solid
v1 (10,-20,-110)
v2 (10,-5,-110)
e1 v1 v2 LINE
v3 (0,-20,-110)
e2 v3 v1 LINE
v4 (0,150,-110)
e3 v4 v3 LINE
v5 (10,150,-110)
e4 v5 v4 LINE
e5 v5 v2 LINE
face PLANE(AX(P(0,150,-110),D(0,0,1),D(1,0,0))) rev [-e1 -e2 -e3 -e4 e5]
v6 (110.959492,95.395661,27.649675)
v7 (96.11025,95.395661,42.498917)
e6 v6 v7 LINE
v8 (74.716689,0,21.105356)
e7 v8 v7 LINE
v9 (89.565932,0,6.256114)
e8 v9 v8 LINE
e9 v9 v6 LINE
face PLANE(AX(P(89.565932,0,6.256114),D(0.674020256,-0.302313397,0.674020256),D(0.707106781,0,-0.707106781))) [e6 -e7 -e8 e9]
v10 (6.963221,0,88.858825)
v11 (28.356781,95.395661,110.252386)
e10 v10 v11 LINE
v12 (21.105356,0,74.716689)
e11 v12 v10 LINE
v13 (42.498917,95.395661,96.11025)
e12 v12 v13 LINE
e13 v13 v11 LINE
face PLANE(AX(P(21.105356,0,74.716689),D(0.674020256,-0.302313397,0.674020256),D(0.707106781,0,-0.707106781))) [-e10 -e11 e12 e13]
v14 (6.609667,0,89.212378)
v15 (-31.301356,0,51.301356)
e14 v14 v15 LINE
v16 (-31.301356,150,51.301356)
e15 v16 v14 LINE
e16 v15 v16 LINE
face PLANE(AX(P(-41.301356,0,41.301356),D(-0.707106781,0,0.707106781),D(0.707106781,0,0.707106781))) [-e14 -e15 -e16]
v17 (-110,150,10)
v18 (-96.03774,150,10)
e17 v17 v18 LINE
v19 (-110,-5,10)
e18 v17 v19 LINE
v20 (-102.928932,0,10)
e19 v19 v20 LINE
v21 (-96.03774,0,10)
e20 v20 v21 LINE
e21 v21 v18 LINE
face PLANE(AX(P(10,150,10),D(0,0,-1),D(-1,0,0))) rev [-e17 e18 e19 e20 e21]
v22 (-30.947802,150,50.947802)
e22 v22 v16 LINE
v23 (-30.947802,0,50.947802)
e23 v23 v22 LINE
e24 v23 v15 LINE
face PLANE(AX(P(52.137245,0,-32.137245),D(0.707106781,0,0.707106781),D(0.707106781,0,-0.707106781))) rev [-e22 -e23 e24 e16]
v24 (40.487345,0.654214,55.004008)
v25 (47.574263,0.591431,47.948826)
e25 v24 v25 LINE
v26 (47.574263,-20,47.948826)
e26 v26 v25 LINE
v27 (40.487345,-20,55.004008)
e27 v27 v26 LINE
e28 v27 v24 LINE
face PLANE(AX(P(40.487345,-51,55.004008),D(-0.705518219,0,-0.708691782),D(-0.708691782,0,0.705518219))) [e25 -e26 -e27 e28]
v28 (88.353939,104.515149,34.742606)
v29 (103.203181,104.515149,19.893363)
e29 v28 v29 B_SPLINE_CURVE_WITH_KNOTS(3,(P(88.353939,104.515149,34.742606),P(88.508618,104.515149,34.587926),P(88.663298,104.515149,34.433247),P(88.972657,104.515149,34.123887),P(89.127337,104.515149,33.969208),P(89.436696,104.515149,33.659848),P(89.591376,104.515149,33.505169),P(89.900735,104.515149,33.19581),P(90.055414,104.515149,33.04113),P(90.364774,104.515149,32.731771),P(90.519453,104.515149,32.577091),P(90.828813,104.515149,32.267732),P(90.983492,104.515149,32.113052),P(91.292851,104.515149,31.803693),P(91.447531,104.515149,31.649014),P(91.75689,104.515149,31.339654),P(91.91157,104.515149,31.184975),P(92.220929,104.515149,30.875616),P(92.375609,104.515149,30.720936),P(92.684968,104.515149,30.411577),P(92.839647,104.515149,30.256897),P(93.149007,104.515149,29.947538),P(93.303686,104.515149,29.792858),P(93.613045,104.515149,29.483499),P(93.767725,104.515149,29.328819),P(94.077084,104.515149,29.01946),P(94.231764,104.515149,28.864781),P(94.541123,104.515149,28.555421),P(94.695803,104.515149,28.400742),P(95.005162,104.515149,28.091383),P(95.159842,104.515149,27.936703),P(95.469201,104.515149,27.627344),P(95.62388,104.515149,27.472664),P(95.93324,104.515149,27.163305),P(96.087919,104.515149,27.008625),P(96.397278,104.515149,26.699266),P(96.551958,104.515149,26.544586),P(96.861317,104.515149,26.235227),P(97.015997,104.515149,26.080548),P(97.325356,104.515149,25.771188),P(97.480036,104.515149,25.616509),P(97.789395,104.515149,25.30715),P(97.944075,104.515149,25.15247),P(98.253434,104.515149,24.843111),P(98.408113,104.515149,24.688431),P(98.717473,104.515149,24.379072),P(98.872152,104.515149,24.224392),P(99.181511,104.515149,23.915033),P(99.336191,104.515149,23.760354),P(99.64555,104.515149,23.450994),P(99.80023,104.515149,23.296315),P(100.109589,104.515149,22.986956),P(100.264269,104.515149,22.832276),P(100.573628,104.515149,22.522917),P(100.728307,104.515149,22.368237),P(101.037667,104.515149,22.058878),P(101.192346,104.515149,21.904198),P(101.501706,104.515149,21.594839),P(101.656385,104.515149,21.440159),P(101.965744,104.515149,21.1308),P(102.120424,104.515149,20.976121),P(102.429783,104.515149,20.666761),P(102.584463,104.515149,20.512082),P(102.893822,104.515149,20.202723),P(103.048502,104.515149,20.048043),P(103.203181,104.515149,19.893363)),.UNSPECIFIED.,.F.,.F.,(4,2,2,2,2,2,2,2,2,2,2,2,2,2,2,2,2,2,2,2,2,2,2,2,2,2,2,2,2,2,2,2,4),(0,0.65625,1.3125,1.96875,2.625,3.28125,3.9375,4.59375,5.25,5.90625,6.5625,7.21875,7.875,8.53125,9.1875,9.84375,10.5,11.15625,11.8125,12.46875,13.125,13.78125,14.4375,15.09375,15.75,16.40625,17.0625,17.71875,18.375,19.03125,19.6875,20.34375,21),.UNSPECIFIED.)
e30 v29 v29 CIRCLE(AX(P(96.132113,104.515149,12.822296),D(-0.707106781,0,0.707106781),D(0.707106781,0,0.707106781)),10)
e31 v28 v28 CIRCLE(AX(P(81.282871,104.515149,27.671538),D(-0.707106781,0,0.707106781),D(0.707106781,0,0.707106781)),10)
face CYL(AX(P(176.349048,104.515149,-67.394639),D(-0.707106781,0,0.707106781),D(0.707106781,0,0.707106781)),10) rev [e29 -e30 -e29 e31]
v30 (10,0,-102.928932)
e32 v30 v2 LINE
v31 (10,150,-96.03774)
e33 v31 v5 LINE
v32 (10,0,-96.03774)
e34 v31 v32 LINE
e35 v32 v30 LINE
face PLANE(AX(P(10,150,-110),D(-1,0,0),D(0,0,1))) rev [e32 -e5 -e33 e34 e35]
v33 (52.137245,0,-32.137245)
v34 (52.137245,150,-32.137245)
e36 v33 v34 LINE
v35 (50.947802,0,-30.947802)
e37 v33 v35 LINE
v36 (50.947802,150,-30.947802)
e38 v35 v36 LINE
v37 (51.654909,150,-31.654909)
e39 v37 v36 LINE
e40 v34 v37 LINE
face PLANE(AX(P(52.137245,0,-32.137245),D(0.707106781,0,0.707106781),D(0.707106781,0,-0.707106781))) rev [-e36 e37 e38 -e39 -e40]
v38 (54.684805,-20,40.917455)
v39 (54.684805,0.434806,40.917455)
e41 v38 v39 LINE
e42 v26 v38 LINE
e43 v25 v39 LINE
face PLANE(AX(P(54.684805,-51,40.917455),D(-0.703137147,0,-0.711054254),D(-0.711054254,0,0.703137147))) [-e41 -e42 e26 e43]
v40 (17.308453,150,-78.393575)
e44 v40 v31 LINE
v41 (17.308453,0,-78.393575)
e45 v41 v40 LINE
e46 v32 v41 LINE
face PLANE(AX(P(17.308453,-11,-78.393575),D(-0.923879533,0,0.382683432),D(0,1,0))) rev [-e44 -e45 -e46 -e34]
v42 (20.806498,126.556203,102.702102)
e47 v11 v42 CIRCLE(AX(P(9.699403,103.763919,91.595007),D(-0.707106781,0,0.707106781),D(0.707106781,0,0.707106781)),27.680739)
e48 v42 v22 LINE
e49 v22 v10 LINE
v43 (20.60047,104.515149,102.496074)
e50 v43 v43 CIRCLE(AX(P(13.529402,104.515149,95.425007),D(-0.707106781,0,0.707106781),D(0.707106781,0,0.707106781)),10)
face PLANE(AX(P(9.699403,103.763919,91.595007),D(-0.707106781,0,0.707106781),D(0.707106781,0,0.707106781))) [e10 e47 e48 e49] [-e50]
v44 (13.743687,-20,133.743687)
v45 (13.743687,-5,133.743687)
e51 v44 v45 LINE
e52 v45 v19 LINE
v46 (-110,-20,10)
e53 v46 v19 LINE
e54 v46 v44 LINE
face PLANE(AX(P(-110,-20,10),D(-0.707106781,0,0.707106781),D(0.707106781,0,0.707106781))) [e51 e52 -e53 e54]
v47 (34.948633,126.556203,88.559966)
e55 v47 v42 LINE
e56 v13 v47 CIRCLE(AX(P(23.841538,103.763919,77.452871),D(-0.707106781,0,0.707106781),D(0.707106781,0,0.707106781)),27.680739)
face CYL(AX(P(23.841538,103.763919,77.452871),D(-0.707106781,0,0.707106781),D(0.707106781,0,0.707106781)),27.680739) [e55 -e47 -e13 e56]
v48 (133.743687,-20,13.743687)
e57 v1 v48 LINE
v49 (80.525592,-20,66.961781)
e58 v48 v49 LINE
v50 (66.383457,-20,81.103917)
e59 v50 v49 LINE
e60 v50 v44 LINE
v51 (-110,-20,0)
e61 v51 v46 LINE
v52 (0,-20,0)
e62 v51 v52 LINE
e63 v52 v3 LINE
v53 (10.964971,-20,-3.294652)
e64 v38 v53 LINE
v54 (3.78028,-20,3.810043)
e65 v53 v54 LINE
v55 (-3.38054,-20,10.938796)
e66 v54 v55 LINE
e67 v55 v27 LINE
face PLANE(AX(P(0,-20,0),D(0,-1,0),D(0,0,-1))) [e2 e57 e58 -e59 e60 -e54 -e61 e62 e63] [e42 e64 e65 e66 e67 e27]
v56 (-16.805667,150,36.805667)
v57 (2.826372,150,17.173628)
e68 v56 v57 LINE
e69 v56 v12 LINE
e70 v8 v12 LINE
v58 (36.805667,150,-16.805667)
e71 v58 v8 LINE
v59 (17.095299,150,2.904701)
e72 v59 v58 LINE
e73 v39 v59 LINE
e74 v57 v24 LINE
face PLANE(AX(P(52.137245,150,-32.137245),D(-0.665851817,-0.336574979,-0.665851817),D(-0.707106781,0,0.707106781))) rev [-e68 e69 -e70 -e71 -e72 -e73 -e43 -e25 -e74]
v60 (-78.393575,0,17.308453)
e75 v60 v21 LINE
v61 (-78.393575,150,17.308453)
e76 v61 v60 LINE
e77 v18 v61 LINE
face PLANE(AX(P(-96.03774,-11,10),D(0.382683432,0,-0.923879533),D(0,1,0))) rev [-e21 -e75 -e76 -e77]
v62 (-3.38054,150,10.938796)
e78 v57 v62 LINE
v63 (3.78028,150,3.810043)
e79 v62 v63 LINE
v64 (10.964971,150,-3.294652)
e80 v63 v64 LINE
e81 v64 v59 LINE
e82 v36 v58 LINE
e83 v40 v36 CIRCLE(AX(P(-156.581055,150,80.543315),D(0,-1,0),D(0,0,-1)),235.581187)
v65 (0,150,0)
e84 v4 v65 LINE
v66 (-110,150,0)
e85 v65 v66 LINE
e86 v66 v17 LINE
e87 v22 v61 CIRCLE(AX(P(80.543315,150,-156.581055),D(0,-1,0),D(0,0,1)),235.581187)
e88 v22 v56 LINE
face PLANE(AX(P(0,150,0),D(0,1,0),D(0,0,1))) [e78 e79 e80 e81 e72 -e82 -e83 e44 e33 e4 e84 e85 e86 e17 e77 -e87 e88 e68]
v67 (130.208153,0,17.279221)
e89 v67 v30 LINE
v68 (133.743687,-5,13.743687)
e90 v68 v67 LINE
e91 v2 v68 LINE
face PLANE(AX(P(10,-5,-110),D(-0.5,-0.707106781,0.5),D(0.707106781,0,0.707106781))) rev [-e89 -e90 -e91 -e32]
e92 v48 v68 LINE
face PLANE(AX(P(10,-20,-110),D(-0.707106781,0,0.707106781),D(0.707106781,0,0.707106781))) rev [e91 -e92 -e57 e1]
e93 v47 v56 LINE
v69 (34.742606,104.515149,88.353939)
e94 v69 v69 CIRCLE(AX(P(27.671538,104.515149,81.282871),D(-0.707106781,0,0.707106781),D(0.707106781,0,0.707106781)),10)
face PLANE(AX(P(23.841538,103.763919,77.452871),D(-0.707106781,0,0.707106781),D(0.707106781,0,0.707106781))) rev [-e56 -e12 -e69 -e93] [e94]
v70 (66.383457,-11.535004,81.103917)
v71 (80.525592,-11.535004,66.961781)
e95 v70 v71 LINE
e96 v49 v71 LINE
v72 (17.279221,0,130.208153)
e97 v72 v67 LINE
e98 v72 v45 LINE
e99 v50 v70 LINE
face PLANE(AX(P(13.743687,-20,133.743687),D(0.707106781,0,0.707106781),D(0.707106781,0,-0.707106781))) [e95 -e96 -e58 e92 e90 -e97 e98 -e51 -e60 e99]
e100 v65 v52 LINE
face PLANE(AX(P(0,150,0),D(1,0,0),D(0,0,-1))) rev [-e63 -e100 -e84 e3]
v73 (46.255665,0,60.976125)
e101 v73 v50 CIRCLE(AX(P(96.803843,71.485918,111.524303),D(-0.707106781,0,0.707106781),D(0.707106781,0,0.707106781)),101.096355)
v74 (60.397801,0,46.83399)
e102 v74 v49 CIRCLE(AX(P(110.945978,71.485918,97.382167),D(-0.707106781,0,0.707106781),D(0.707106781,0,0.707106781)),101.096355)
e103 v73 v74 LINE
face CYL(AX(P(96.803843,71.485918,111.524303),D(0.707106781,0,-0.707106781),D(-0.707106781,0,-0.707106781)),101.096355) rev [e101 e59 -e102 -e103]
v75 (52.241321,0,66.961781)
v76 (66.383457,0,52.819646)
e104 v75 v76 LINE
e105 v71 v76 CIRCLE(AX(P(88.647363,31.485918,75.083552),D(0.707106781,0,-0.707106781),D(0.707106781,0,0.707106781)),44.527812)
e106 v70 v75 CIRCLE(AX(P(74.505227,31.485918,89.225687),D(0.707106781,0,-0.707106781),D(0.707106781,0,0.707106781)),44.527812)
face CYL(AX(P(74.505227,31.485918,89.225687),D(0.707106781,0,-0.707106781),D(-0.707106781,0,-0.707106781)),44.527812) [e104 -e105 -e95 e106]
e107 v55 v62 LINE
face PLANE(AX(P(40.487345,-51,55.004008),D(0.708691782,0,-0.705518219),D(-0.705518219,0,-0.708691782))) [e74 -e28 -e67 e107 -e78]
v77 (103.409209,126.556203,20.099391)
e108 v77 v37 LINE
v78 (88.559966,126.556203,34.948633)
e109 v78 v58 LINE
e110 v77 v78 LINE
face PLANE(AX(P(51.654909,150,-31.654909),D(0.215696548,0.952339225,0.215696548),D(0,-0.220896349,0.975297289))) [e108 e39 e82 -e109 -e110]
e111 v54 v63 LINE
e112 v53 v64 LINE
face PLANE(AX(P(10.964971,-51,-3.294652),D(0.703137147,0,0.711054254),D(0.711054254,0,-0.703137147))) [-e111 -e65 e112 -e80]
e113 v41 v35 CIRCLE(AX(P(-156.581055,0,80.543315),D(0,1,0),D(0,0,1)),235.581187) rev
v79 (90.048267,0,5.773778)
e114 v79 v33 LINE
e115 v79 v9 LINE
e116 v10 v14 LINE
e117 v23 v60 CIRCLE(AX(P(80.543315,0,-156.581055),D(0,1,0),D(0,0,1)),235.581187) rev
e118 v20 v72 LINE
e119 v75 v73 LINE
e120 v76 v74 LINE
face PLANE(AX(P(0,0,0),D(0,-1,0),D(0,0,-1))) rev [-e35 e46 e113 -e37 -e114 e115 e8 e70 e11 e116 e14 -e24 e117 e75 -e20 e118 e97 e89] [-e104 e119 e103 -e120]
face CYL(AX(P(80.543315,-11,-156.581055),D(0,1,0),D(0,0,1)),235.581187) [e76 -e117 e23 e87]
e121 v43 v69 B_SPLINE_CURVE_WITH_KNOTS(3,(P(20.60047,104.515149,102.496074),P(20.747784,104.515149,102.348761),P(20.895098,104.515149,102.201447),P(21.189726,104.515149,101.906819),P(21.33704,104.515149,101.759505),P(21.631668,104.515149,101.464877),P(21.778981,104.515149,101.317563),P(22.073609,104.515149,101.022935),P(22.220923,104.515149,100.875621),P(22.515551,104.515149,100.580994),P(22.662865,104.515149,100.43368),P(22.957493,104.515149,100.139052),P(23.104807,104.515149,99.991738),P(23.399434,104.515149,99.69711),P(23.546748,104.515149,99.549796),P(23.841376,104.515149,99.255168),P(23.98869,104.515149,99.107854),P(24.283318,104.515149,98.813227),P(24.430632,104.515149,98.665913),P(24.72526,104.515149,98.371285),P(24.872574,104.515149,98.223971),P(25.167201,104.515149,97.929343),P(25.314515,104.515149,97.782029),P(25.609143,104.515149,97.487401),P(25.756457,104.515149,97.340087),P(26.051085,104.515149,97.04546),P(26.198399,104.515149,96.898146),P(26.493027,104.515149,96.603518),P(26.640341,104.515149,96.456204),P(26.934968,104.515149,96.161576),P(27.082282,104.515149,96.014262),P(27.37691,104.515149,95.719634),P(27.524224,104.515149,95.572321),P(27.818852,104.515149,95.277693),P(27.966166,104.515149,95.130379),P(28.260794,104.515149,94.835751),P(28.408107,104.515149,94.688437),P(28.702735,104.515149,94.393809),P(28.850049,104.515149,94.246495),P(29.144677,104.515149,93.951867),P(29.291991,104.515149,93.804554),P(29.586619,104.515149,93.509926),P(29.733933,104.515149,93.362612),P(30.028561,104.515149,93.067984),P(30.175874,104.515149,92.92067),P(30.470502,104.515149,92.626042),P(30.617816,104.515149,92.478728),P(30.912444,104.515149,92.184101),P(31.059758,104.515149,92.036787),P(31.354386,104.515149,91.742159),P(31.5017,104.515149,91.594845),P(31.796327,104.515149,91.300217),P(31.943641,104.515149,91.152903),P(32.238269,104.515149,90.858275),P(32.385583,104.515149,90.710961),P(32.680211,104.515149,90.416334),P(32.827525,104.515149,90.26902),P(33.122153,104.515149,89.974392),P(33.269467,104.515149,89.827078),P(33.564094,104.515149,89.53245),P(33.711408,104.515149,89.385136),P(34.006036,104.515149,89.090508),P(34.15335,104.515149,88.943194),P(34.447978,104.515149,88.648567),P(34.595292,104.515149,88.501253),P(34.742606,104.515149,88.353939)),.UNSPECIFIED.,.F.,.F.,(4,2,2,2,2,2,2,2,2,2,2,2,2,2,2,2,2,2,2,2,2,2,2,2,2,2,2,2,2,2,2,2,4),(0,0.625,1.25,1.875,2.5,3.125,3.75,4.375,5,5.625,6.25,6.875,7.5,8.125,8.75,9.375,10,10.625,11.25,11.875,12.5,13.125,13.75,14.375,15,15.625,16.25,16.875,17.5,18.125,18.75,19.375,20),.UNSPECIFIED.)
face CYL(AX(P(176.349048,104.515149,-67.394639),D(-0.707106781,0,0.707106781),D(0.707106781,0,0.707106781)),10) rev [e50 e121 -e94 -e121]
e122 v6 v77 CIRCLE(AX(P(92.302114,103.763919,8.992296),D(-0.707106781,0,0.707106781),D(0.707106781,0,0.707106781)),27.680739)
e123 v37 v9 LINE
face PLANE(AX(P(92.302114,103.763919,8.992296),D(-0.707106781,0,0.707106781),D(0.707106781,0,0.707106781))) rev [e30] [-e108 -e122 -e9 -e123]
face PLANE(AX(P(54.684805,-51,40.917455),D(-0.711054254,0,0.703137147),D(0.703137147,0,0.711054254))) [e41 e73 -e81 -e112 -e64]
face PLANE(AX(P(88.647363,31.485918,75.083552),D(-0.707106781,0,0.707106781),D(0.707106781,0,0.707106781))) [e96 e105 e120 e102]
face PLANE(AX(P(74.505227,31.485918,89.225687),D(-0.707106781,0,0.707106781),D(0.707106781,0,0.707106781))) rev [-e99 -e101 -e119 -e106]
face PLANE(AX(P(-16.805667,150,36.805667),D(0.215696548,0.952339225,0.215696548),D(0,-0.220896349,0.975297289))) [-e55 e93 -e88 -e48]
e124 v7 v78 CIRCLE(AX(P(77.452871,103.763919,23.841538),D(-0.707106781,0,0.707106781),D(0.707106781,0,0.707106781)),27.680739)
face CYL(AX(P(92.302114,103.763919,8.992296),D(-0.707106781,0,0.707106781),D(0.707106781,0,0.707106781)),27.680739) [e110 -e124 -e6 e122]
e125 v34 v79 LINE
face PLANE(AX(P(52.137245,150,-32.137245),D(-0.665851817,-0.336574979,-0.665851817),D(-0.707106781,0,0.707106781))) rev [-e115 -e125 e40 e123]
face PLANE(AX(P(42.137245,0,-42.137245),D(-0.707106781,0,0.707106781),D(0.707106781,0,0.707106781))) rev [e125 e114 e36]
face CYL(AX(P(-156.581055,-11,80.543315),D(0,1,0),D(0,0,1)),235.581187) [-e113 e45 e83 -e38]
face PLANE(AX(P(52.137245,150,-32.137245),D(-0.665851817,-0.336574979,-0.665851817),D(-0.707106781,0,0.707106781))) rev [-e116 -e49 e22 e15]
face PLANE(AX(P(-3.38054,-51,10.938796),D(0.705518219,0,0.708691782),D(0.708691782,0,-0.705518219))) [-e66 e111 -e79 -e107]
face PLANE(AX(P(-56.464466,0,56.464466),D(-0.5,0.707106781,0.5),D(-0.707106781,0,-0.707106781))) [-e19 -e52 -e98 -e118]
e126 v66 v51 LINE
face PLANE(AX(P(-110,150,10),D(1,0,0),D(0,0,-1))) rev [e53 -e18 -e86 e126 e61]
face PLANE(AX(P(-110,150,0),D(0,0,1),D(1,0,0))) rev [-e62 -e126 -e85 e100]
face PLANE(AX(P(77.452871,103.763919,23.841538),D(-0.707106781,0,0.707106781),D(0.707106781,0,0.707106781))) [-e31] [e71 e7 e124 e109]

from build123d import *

# Parameters (mm, degrees)
EXTRUDE_1_DEPTH          = 150
EXTRUDE_2_DEPTH          = 150
CUT_EXTRUDE_3_DEPTH      = 161
CHAMFER_4_SIZE           = 10
CHAMFER_5_SIZE           = 10
EXTRUDE_7_DEPTH          = 20
CHAMFER_6_SIZE           = 5
CHAMFER_7_SIZE           = 5
EXTRUDE_8_DEPTH          = 58
EXTRUDE_8_DEPTH_BACK     = 60
EXTRUDE_9_DEPTH          = 20
EXTRUDE_17_DEPTH         = 20
EXTRUDE_17_DEPTH_BACK    = 1
CUT_EXTRUDE_6_DEPTH      = 276.322275262
CUT_EXTRUDE_6_DEPTH_BACK = 276.322275262
SKETCH_13_R              = 10
CUT_EXTRUDE_8_DEPTH      = 10
CUT_EXTRUDE_8_DEPTH_BACK = 10
CUT_EXTRUDE_9_DEPTH      = 31
CUT_EXTRUDE_9_DEPTH_BACK = 182


with BuildPart() as part:
    # 草图1 → 凸台-拉伸1 (new body)
    with BuildSketch(Plane(origin=(0, 0, 0), x_dir=(1, 0, 0), z_dir=(0, 1, 0))):
        Polygon((0, 0), (0, 110), (10, 110), (10, -10), (-110, -10), (-110, 0), align=None)
    extrude(amount=EXTRUDE_1_DEPTH)

    # 草图2 → 凸台-拉伸2 (add)
    with BuildSketch(Plane(origin=(0, 150, 0), x_dir=(1, 0, 0), z_dir=(0, 1, 0))):
        Polygon((10, 86.03773993), (10, -10), (58.018869965, 38.018869965), align=None)
        Polygon((-86.03773993, -10), (10, -10), (-38.018869965, -58.018869965), align=None)
    extrude(amount=-EXTRUDE_2_DEPTH)

    # 草图5 → 切除-拉伸3 (cut)
    with BuildSketch(Plane(origin=(0, 150, 0), x_dir=(1, 0, 0), z_dir=(0, 1, 0))):
        with BuildLine():
            Line((-86.03773993, -10), (-38.018869965, -58.018869965))
            Line((-38.018869965, -58.018869965), (-30.947802153, -50.947802153))
            ThreePointArc((-30.947802153, -50.947802153), (-59.992139056, -32.491105573), (-86.03773993, -10))
        make_face()
        with BuildLine():
            Line((10, 86.03773993), (58.018869965, 38.018869965))
            Line((58.018869965, 38.018869965), (50.947802153, 30.947802153))
            ThreePointArc((50.947802153, 30.947802153), (32.491105573, 59.992139056), (10, 86.03773993))
        make_face()
    extrude(amount=-CUT_EXTRUDE_3_DEPTH, mode=Mode.SUBTRACT)

    # 倒角4
    # the kernel refuses this chamfer: 10 mm, written as the material it adds along each edge
    with BuildSketch(Plane(origin=(-86.03773993, 150, 10), x_dir=(-1, 0, 0), z_dir=(0, -1, 0))) as chamfer_4_piece_1:
        with BuildLine():
            Line((CHAMFER_4_SIZE, 0), (-7.644165176, -7.308452513))
            ThreePointArc((-7.644165176, -7.308452513), (-3.915956427, -3.825991439), (0, 0))
            Line((0, 0), (CHAMFER_4_SIZE, 0))
        make_face()
    extrude(amount=150)

    # 倒角5
    # the kernel refuses this chamfer: 10 mm, written as the material it adds along each edge
    with BuildSketch(Plane(origin=(10, 150, -86.03773993), x_dir=(0.6910568330345163, 0, 0.7228004244024105), z_dir=(0, -1, 0))) as chamfer_5_piece_1:
        with BuildLine():
            Line((10.575761882, 0), (-CHAMFER_5_SIZE * 0.722800424402, -CHAMFER_5_SIZE * 0.691056833035))
            Line((-CHAMFER_5_SIZE * 0.722800424402, -CHAMFER_5_SIZE * 0.691056833035), (0, 0))
            ThreePointArc((0, 0), (5.474432495, -0.059279789), (10.575761882, 0))
        make_face()
    extrude(amount=150)

    # 草图8 → 凸台-拉伸7 (add)
    with BuildSketch(Plane(origin=(0, 0, 0), x_dir=(-1, 0, 0), z_dir=(0, -1, 0))):
        Polygon((110, 0), (0, 0), (0, 110), (-10, 110), (-133.743686708, -13.743686708), (-73.743686708, -73.743686708), (-13.743686708, -133.743686708), (110, -10), align=None)
    extrude(amount=EXTRUDE_7_DEPTH)

    # 倒角6
    chamfer_6_edges = [part.edges().sort_by_distance(p)[0] for p in [
        (-48.128156646, 0, 71.871843354),
    ]]
    chamfer(chamfer_6_edges, length=CHAMFER_6_SIZE)

    # 倒角7
    chamfer_7_edges = [part.edges().sort_by_distance(p)[0] for p in [
        (71.871843354, 0, -48.128156646),
    ]]
    chamfer(chamfer_7_edges, length=CHAMFER_7_SIZE)

    # 草图9 → 凸台-拉伸8 (add, two sides: drawn at the far end of the back side and taken through both)
    with BuildSketch(Plane(origin=(-0.289162235, 0, 0.289162235), x_dir=(0.7071067811865451, 0, 0.70710678118655), z_dir=(-0.70710678118655, 0, 0.7071067811865451)).offset(-EXTRUDE_8_DEPTH_BACK)):
        Polygon((14.142135624, 150), (67.756418231, 0), (14.142135624, 0), align=None)
    extrude(amount=EXTRUDE_8_DEPTH + EXTRUDE_8_DEPTH_BACK)

    # 草图10 → 凸台-拉伸9 (add)
    with BuildSketch(Plane(origin=(-40.947802153, 0, 40.947802153), x_dir=(0.7071067811865452, 0, 0.7071067811865498), z_dir=(-0.7071067811865498, 0, 0.7071067811865452))):
        with BuildLine():
            Line((14.142135624, 150), (87.333768107, 126.556202944))
            ThreePointArc((87.333768107, 126.556202944), (97.811967476, 112.737019173), (98.011481853, 95.395661207))
            Line((98.011481853, 95.395661207), (67.756418231, 0))
            Line((67.756418231, 0), (14.142135624, 150))
        make_face()
    extrude(amount=-EXTRUDE_9_DEPTH)

    # 草图12 → 凸台-拉伸17 (add, two sides: drawn at the far end of the back side and taken through both)
    with BuildSketch(Plane(origin=(40.947802153, 0, -40.947802153), x_dir=(0.7071067811865452, 0, 0.7071067811865498), z_dir=(-0.7071067811865498, 0, 0.7071067811865452)).offset(-EXTRUDE_17_DEPTH_BACK)):
        with BuildLine():
            Line((14.142135624, 150), (87.333768107, 126.556202944))
            ThreePointArc((87.333768107, 126.556202944), (97.811967476, 112.737019173), (98.011481853, 95.395661207))
            Line((98.011481853, 95.395661207), (67.756418231, 0))
            Line((67.756418231, 0), (14.142135624, 150))
        make_face()
    extrude(amount=EXTRUDE_17_DEPTH + EXTRUDE_17_DEPTH_BACK)

    # 草图13 → 切除-拉伸6 (cut, two sides: drawn at the far end of the back side and taken through both)
    with BuildSketch(Plane(origin=(-40.947802153, 0, 40.947802153), x_dir=(0.7071067811865452, 0, 0.7071067811865498), z_dir=(-0.7071067811865498, 0, 0.7071067811865452)).offset(-CUT_EXTRUDE_6_DEPTH_BACK)):
        with Locations((77.042401388, 104.51514855)):
            Circle(SKETCH_13_R)
    extrude(amount=CUT_EXTRUDE_6_DEPTH + CUT_EXTRUDE_6_DEPTH_BACK, mode=Mode.SUBTRACT)

    # 草图15 → 切除-拉伸8 (cut, two sides: drawn at the far end of the back side and taken through both)
    with BuildSketch(Plane(origin=(-0.289162235, 0, 0.289162235), x_dir=(0.7071067811865451, 0, 0.70710678118655), z_dir=(-0.70710678118655, 0, 0.7071067811865451)).offset(-CUT_EXTRUDE_8_DEPTH_BACK)):
        with BuildLine():
            Line((75.824326152, 0), (84.289321881, 0))
            ThreePointArc((84.289321881, 0), (93.528695136, -7.086316984), (104.289321881, -11.535004271))
            Line((104.289321881, -11.535004271), (104.289321881, -20))
            ThreePointArc((104.289321881, -20), (89.190074528, -11.233601025), (75.824326152, 0))
        make_face()
    extrude(amount=CUT_EXTRUDE_8_DEPTH + CUT_EXTRUDE_8_DEPTH_BACK, mode=Mode.SUBTRACT)

    # 草图18 → 切除-拉伸9 (cut, two sides: drawn at the far end of the back side and taken through both)
    with BuildSketch(Plane.XZ.offset(20).offset(-CUT_EXTRUDE_9_DEPTH_BACK)):
        Polygon((40.487345, 55.004008196), (-3.380540201, 10.938796408), (3.780279879, 3.810042897), (10.964971033, -3.294651596), (54.684805363, 40.917454531), (47.574262823, 47.948826004), align=None)
    extrude(amount=CUT_EXTRUDE_9_DEPTH + CUT_EXTRUDE_9_DEPTH_BACK, mode=Mode.SUBTRACT)


solid = part.part
